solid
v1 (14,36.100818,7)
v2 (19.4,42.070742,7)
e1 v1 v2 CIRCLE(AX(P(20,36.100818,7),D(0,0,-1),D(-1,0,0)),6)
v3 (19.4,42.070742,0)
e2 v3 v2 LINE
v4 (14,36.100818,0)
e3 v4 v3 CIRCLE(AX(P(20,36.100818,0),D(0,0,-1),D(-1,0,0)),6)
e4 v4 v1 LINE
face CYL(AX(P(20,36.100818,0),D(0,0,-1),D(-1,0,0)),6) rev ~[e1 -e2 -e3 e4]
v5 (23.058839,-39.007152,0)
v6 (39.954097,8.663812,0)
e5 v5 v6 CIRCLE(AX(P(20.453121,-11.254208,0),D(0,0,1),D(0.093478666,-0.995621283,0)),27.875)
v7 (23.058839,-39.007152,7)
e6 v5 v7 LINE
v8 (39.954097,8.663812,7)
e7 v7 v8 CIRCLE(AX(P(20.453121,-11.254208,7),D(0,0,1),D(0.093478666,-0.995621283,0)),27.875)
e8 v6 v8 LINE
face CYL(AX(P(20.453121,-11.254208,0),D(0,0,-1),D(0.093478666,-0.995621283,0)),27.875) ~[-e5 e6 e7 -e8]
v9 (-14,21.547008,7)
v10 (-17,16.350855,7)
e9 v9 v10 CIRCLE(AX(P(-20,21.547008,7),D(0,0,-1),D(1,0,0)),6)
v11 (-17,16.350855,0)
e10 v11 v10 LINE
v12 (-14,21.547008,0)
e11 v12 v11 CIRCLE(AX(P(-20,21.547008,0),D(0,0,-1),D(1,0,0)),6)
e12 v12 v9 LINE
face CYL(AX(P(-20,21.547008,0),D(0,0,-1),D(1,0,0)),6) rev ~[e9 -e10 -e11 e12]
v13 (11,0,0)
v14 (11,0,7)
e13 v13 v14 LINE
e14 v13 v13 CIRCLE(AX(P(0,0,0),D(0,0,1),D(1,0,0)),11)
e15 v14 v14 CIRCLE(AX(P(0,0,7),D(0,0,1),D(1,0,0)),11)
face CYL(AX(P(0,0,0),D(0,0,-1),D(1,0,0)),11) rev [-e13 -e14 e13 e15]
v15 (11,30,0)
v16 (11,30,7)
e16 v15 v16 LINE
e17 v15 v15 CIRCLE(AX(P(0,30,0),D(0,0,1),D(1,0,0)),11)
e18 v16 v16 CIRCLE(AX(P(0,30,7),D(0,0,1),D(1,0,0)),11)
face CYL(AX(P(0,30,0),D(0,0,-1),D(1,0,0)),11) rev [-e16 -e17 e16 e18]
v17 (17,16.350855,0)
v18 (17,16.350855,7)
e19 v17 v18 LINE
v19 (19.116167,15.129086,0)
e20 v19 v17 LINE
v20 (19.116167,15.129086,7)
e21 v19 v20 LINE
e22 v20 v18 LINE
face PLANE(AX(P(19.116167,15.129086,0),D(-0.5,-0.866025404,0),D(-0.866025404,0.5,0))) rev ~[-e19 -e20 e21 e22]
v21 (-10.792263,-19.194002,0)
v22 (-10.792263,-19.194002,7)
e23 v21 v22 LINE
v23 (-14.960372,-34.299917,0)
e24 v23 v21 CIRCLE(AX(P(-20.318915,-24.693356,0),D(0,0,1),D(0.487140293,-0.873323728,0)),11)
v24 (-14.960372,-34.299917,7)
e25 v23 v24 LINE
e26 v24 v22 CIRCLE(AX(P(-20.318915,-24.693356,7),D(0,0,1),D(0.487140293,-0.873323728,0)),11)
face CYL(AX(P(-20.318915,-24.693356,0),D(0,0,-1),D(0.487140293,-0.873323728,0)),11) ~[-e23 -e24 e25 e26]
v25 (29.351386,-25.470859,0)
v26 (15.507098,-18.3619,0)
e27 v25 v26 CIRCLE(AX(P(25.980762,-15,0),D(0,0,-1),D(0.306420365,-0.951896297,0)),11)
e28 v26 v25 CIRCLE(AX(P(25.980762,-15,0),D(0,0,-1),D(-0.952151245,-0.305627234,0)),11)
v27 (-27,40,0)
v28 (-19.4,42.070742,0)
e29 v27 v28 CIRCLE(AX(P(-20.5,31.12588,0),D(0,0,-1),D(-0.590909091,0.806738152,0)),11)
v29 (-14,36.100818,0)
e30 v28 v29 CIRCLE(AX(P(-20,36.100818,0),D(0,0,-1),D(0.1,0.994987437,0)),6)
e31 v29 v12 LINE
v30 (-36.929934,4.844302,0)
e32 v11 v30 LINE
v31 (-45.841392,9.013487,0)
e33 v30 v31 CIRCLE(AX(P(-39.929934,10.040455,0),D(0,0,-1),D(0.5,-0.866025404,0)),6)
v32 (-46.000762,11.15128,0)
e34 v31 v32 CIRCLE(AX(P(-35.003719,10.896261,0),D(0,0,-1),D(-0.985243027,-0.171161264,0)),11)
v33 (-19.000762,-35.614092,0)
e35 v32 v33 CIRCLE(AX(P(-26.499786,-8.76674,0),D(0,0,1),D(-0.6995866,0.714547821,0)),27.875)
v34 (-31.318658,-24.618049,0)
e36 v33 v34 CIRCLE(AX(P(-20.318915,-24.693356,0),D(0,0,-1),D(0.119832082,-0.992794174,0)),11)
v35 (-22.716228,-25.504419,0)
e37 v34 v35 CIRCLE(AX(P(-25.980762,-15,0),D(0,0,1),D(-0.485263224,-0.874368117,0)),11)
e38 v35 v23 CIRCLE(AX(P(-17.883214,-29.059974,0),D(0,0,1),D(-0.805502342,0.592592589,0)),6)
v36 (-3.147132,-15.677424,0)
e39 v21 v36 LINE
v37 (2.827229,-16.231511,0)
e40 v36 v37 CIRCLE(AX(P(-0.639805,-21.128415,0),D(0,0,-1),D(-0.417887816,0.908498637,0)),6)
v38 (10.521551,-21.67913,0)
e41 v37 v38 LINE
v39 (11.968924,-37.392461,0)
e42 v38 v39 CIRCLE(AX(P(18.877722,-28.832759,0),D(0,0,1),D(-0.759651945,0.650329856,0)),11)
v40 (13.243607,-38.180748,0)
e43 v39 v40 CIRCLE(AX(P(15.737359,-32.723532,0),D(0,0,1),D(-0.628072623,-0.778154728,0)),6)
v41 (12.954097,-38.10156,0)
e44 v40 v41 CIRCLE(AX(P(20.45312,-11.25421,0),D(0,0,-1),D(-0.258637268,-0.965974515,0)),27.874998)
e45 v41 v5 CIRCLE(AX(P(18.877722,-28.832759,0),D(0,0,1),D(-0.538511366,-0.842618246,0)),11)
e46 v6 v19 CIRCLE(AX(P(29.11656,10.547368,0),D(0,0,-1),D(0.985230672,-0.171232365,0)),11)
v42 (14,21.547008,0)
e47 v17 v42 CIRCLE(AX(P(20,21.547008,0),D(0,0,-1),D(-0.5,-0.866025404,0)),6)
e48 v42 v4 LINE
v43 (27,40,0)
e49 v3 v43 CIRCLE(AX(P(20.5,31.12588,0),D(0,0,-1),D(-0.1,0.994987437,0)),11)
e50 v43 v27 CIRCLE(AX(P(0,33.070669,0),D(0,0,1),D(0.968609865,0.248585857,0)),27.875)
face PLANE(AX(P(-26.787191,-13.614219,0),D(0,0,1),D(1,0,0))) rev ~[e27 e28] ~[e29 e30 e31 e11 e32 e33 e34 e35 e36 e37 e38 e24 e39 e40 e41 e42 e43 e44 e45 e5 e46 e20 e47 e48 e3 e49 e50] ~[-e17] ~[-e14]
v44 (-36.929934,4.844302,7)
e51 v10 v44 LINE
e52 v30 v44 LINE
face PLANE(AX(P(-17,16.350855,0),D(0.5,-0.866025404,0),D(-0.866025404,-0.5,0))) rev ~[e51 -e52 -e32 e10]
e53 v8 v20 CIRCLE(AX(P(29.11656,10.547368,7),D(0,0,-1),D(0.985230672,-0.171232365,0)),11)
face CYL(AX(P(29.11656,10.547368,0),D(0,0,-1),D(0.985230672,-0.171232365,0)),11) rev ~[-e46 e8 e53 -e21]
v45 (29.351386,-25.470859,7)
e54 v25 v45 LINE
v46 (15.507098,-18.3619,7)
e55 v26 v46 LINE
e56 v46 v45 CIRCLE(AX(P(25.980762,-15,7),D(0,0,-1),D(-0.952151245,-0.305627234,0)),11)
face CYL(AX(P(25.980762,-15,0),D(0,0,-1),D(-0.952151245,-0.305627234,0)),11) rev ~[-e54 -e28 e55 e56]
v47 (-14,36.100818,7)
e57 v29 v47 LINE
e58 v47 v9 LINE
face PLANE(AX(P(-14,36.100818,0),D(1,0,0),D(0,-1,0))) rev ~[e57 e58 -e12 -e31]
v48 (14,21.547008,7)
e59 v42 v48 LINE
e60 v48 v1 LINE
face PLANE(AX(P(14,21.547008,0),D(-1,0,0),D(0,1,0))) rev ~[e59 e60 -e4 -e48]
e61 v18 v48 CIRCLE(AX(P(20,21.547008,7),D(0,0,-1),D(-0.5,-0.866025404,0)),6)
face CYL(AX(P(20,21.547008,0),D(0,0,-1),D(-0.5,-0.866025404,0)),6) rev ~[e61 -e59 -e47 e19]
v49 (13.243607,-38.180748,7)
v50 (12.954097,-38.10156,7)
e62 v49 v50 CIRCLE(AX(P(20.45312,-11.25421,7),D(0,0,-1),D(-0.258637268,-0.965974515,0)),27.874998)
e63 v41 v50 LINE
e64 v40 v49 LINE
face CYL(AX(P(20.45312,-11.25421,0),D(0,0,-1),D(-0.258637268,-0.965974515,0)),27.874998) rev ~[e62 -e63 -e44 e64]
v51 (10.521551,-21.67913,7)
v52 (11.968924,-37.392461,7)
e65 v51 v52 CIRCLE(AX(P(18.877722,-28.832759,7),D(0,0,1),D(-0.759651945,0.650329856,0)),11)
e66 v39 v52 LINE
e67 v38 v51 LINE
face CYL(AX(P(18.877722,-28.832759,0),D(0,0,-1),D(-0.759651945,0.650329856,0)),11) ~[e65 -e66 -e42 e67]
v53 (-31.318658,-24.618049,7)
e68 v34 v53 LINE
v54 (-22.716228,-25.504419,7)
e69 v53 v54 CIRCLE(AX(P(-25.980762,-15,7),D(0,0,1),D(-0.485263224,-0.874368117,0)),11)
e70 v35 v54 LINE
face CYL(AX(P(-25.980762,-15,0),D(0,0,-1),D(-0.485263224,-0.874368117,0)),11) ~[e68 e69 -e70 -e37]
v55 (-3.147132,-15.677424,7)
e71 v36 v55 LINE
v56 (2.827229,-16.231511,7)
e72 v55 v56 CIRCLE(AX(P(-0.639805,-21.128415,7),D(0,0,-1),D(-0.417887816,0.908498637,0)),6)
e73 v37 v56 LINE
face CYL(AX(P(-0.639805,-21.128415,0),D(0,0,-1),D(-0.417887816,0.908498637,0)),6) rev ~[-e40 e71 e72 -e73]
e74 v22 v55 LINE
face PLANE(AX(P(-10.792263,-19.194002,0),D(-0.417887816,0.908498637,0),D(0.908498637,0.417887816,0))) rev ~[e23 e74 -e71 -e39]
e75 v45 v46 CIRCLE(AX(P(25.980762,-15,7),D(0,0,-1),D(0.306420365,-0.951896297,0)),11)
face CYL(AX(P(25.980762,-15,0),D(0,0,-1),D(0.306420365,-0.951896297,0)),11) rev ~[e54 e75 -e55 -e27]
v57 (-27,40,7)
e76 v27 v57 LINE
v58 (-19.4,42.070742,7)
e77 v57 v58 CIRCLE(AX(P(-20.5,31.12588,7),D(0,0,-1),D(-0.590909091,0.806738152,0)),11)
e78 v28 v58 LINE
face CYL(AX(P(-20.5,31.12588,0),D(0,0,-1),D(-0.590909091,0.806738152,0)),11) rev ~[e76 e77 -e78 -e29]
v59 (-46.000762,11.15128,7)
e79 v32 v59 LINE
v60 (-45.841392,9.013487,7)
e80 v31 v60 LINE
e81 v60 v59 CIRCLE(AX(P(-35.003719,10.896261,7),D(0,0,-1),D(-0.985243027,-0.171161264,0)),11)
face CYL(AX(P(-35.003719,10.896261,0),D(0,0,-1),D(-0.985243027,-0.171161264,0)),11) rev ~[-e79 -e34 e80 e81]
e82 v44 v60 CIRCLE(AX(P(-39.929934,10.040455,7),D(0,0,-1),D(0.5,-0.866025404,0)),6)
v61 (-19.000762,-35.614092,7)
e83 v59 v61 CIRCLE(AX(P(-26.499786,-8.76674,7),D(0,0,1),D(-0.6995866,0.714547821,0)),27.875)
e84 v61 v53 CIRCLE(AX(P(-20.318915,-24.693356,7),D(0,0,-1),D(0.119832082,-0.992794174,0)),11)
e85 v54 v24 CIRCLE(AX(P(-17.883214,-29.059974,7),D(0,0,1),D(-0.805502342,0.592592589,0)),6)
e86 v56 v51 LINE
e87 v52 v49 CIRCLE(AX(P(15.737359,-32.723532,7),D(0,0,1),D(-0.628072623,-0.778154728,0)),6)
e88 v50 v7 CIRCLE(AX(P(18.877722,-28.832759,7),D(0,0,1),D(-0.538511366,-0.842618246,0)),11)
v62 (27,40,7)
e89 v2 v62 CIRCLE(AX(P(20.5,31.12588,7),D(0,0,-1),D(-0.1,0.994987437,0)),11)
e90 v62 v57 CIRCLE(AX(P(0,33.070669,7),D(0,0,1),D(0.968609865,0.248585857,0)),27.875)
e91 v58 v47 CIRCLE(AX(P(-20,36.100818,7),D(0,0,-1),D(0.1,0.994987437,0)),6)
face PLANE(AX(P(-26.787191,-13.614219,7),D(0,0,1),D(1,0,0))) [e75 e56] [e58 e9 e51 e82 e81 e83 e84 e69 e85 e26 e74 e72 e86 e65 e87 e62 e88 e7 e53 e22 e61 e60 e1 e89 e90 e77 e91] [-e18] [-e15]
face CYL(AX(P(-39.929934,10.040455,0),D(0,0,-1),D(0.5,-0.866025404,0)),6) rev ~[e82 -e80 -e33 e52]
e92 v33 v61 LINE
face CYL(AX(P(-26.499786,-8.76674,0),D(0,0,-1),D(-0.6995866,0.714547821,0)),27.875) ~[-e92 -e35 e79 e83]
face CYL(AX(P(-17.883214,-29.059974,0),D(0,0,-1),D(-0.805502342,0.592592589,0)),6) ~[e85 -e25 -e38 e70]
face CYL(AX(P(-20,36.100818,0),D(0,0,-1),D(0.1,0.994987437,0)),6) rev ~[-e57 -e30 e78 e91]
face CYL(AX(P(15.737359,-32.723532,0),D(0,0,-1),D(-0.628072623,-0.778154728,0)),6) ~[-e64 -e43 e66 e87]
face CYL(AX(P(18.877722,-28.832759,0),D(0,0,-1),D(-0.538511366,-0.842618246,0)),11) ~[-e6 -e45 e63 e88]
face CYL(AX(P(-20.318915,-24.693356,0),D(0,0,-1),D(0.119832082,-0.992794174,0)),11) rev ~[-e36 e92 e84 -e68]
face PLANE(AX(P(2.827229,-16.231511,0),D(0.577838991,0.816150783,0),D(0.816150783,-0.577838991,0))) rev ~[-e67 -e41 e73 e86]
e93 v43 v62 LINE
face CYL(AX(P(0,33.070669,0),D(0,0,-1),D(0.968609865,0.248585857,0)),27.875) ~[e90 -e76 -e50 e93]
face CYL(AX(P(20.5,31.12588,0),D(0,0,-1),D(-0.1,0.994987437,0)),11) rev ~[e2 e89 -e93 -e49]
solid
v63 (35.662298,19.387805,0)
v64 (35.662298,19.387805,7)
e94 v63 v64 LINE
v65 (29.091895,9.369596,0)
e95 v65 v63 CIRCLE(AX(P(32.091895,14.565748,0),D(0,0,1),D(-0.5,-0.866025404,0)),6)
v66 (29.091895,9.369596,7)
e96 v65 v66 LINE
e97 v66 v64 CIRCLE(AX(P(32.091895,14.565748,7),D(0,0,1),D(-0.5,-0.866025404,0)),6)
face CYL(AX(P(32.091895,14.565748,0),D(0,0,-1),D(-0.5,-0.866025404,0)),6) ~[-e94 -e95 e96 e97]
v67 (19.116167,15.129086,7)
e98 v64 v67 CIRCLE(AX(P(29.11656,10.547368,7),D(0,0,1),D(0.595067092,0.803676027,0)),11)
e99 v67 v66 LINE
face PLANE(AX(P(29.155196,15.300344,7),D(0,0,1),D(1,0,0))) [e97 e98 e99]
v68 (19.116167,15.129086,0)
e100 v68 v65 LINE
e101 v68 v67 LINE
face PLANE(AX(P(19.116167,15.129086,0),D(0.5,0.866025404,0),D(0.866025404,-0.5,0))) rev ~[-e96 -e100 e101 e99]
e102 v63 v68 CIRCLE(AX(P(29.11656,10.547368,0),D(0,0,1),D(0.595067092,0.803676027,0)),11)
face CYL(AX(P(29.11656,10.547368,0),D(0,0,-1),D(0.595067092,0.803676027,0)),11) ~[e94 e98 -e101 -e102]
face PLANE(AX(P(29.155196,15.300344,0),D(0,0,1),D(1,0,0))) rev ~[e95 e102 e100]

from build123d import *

# Parameters (mm, degrees)
F0_R     = 11
F1_DEPTH = 7


# Not quite as in the source:
# - a feature of the source that left no trace in its solid (it failed there, or was rolled back) is left out


with BuildPart() as f1:
    # F0 (on Top) → F1 (new body)
    with BuildSketch(Plane.XY):
        with BuildLine():
            ThreePointArc((-14.9810198925, -15.0753065176), (-14.9808265585, -15.0376534794), (-14.9807621135, -15))
            ThreePointArc((-14.9807621135, -15), (-31.5612257999, -5.5206316115), (-31.3186575763, -24.6180492839))
            ThreePointArc((-31.3186575763, -24.6180492839), (-25.8668980567, -15.1949407788), (-14.9810198925, -15.0753065176))
        make_face()
        with BuildLine():
            ThreePointArc((-31.3186575763, -24.6180492839), (-31.5612257999, -5.5206316115), (-14.9807621135, -15))
            ThreePointArc((-14.9807621135, -15), (-14.9808265585, -15.0376534794), (-14.9810198925, -15.0753065176))
            ThreePointArc((-14.9810198925, -15.0753065176), (-12.6066127008, -16.8498624622), (-10.7922626222, -19.1940024121))
            Line((-10.7922626222, -19.1940024121), (-3.1471315948, -15.6774235403))
            ThreePointArc((-3.1471315948, -15.6774235403), (-0.0857175759, -15.1540545193), (2.8272292465, -16.231510661))
            Line((2.8272292465, -16.231510661), (10.5215510319, -21.6791304199))
            ThreePointArc((10.5215510319, -21.6791304199), (12.7842474134, -19.6747261792), (15.5070984162, -18.3618995755))
            ThreePointArc((15.5070984162, -18.3618995755), (24.2793363394, -4.1323806501), (36.9807621135, -15))
            ThreePointArc((36.9807621135, -15), (34.8711182406, -21.4777749215), (29.3513861257, -25.470859266))
            ThreePointArc((29.3513861257, -25.470859266), (28.8526132199, -33.4697356256), (23.0588387456, -39.0071515183))
            ThreePointArc((23.0588387456, -39.0071515183), (46.7268088994, -20.5659720475), (39.9540974013, 8.6638122562))
            ThreePointArc((39.9540974013, 8.6638122562), (25.8569369314, 0.0414243654), (19.1161667268, 15.1290856588))
            Line((19.1161667268, 15.1290856588), (17, 16.3508550882))
            ThreePointArc((17, 16.3508550882), (14.8038475773, 18.5470075109), (14, 21.5470075109))
            Line((14, 21.5470075109), (14, 36.1008175109))
            ThreePointArc((14, 36.1008175109), (15.5502809077, 40.1257398704), (19.4, 42.0707421335))
            ThreePointArc((19.4, 42.0707421335), (23.3917111277, 41.73898575), (27, 40))
            ThreePointArc((27, 40), (0, 60.9456692242), (-27, 40))
            ThreePointArc((-27, 40), (-23.3917111277, 41.73898575), (-19.4, 42.0707421335))
            ThreePointArc((-19.4, 42.0707421335), (-15.5502809077, 40.1257398704), (-14, 36.1008175109))
            Line((-14, 36.1008175109), (-14, 21.5470075109))
            ThreePointArc((-14, 21.5470075109), (-14.8038475773, 18.5470075109), (-17, 16.3508550882))
            Line((-17, 16.3508550882), (-36.9299341095, 4.8443022651))
            ThreePointArc((-36.9299341095, 4.8443022651), (-42.4725061765, 4.6058132751), (-45.8413922703, 9.0134871064))
            ThreePointArc((-45.8413922703, 9.0134871064), (-45.9732793063, 10.0784919978), (-46.000762454, 11.1512800876))
            ThreePointArc((-46.000762454, 11.1512800876), (-50.6402441015, -22.7042404267), (-19.000762454, -35.6140917168))
            ThreePointArc((-19.000762454, -35.6140917168), (-27.6443184319, -32.8993578589), (-31.3186575763, -24.6180492839))
        make_face()
        Circle(F0_R, mode=Mode.SUBTRACT)
        with Locations((0, 30)):
            Circle(F0_R, mode=Mode.SUBTRACT)
        with BuildLine():
            ThreePointArc((-14.9810198925, -15.0753065176), (-25.8668980567, -15.1949407788), (-31.3186575763, -24.6180492839))
            ThreePointArc((-31.3186575763, -24.6180492839), (-27.1082014874, -25.9420692951), (-22.7162279438, -25.5044189109))
            ThreePointArc((-22.7162279438, -25.5044189109), (-21.6737707093, -24.4089875601), (-20.3905407876, -23.6089826237))
            Line((-20.3905407876, -23.6089826237), (-17.9001022816, -22.4634400032))
            ThreePointArc((-17.9001022816, -22.4634400032), (-15.7503386264, -19.0420830366), (-14.9810198925, -15.0753065176))
        make_face()
        with BuildLine():
            ThreePointArc((-10.7922626222, -19.1940024121), (-12.6066127008, -16.8498624622), (-14.9810198925, -15.0753065176))
            ThreePointArc((-14.9810198925, -15.0753065176), (-15.7503386264, -19.0420830366), (-17.9001022816, -22.4634400032))
            Line((-17.9001022816, -22.4634400032), (-10.7922626222, -19.1940024121))
        make_face()
        with BuildLine():
            ThreePointArc((-20.3905407876, -23.6089826237), (-21.6737707093, -24.4089875601), (-22.7162279438, -25.5044189109))
            ThreePointArc((-22.7162279438, -25.5044189109), (-20.1079225182, -24.3010620408), (-17.9001022816, -22.4634400032))
            Line((-17.9001022816, -22.4634400032), (-20.3905407876, -23.6089826237))
        make_face()
        with BuildLine():
            ThreePointArc((-17.9001022816, -22.4634400032), (-20.1079225182, -24.3010620408), (-22.7162279438, -25.5044189109))
            ThreePointArc((-22.7162279438, -25.5044189109), (-22.3834789255, -33.0283008678), (-14.9603721303, -34.299916815))
            ThreePointArc((-14.9603721303, -34.299916815), (-9.7151694528, -27.619201463), (-10.7922626222, -19.1940024121))
            Line((-10.7922626222, -19.1940024121), (-17.9001022816, -22.4634400032))
        make_face()
        with BuildLine():
            ThreePointArc((15.5070984162, -18.3618995755), (12.7842474134, -19.6747261792), (10.5215510319, -21.6791304199))
            Line((10.5215510319, -21.6791304199), (19.2043932568, -27.8266277806))
            ThreePointArc((19.2043932568, -27.8266277806), (21.4514676336, -34.5535505425), (15.7145306517, -38.7234890511))
            ThreePointArc((15.7145306517, -38.7234890511), (19.3772945803, -39.1084399418), (23.0588387456, -39.0071515183))
            ThreePointArc((23.0588387456, -39.0071515183), (28.8526132199, -33.4697356256), (29.3513861257, -25.470859266))
            ThreePointArc((29.3513861257, -25.470859266), (20.9560611112, -24.7853144986), (15.5070984162, -18.3618995755))
        make_face()
        with BuildLine():
            Line((19.2043932568, -27.8266277806), (10.5215510319, -21.6791304199))
            ThreePointArc((10.5215510319, -21.6791304199), (7.9240920964, -29.8417100549), (11.968923576, -37.3924608467))
            ThreePointArc((11.968923576, -37.3924608467), (12.5815553416, -37.8265611192), (13.2436070612, -38.1807478602))
            ThreePointArc((13.2436070612, -38.1807478602), (14.4729085443, -38.4801643471), (15.7145306517, -38.7234890511))
            ThreePointArc((15.7145306517, -38.7234890511), (21.4514676336, -34.5535505425), (19.2043932568, -27.8266277806))
        make_face()
        with BuildLine():
            ThreePointArc((13.2436070612, -38.1807478602), (14.450138713, -38.5838279613), (15.7145306517, -38.7234890511))
            ThreePointArc((15.7145306517, -38.7234890511), (14.4729085443, -38.4801643471), (13.2436070612, -38.1807478602))
        make_face()
        with BuildLine():
            ThreePointArc((23.0588387456, -39.0071515183), (19.3772945803, -39.1084399418), (15.7145306517, -38.7234890511))
            ThreePointArc((15.7145306517, -38.7234890511), (14.450138713, -38.5838279613), (13.2436070612, -38.1807478602))
            ThreePointArc((13.2436070612, -38.1807478602), (13.0987456479, -38.1415433693), (12.9540974013, -38.1015595481))
            ThreePointArc((12.9540974013, -38.1015595481), (17.8958322334, -39.7888480911), (23.0588387456, -39.0071515183))
        make_face()
    extrude(amount=F1_DEPTH)


with BuildPart() as f1b:
    # F0 (on Top) → F1, piece 2 (new body)
    with BuildSketch(Plane.XY):
        with BuildLine():
            ThreePointArc((35.6622980234, 19.3878045659), (26.3746934117, 21.2001691989), (19.1161667268, 15.1290856588))
            Line((19.1161667268, 15.1290856588), (29.0918954701, 9.3695959835))
            ThreePointArc((29.0918954701, 9.3695959835), (37.1091123847, 11.2752264975), (35.6622980234, 19.3878045659))
        make_face()
    extrude(amount=F1_DEPTH)


solid = Compound([f1.part, f1b.part])
